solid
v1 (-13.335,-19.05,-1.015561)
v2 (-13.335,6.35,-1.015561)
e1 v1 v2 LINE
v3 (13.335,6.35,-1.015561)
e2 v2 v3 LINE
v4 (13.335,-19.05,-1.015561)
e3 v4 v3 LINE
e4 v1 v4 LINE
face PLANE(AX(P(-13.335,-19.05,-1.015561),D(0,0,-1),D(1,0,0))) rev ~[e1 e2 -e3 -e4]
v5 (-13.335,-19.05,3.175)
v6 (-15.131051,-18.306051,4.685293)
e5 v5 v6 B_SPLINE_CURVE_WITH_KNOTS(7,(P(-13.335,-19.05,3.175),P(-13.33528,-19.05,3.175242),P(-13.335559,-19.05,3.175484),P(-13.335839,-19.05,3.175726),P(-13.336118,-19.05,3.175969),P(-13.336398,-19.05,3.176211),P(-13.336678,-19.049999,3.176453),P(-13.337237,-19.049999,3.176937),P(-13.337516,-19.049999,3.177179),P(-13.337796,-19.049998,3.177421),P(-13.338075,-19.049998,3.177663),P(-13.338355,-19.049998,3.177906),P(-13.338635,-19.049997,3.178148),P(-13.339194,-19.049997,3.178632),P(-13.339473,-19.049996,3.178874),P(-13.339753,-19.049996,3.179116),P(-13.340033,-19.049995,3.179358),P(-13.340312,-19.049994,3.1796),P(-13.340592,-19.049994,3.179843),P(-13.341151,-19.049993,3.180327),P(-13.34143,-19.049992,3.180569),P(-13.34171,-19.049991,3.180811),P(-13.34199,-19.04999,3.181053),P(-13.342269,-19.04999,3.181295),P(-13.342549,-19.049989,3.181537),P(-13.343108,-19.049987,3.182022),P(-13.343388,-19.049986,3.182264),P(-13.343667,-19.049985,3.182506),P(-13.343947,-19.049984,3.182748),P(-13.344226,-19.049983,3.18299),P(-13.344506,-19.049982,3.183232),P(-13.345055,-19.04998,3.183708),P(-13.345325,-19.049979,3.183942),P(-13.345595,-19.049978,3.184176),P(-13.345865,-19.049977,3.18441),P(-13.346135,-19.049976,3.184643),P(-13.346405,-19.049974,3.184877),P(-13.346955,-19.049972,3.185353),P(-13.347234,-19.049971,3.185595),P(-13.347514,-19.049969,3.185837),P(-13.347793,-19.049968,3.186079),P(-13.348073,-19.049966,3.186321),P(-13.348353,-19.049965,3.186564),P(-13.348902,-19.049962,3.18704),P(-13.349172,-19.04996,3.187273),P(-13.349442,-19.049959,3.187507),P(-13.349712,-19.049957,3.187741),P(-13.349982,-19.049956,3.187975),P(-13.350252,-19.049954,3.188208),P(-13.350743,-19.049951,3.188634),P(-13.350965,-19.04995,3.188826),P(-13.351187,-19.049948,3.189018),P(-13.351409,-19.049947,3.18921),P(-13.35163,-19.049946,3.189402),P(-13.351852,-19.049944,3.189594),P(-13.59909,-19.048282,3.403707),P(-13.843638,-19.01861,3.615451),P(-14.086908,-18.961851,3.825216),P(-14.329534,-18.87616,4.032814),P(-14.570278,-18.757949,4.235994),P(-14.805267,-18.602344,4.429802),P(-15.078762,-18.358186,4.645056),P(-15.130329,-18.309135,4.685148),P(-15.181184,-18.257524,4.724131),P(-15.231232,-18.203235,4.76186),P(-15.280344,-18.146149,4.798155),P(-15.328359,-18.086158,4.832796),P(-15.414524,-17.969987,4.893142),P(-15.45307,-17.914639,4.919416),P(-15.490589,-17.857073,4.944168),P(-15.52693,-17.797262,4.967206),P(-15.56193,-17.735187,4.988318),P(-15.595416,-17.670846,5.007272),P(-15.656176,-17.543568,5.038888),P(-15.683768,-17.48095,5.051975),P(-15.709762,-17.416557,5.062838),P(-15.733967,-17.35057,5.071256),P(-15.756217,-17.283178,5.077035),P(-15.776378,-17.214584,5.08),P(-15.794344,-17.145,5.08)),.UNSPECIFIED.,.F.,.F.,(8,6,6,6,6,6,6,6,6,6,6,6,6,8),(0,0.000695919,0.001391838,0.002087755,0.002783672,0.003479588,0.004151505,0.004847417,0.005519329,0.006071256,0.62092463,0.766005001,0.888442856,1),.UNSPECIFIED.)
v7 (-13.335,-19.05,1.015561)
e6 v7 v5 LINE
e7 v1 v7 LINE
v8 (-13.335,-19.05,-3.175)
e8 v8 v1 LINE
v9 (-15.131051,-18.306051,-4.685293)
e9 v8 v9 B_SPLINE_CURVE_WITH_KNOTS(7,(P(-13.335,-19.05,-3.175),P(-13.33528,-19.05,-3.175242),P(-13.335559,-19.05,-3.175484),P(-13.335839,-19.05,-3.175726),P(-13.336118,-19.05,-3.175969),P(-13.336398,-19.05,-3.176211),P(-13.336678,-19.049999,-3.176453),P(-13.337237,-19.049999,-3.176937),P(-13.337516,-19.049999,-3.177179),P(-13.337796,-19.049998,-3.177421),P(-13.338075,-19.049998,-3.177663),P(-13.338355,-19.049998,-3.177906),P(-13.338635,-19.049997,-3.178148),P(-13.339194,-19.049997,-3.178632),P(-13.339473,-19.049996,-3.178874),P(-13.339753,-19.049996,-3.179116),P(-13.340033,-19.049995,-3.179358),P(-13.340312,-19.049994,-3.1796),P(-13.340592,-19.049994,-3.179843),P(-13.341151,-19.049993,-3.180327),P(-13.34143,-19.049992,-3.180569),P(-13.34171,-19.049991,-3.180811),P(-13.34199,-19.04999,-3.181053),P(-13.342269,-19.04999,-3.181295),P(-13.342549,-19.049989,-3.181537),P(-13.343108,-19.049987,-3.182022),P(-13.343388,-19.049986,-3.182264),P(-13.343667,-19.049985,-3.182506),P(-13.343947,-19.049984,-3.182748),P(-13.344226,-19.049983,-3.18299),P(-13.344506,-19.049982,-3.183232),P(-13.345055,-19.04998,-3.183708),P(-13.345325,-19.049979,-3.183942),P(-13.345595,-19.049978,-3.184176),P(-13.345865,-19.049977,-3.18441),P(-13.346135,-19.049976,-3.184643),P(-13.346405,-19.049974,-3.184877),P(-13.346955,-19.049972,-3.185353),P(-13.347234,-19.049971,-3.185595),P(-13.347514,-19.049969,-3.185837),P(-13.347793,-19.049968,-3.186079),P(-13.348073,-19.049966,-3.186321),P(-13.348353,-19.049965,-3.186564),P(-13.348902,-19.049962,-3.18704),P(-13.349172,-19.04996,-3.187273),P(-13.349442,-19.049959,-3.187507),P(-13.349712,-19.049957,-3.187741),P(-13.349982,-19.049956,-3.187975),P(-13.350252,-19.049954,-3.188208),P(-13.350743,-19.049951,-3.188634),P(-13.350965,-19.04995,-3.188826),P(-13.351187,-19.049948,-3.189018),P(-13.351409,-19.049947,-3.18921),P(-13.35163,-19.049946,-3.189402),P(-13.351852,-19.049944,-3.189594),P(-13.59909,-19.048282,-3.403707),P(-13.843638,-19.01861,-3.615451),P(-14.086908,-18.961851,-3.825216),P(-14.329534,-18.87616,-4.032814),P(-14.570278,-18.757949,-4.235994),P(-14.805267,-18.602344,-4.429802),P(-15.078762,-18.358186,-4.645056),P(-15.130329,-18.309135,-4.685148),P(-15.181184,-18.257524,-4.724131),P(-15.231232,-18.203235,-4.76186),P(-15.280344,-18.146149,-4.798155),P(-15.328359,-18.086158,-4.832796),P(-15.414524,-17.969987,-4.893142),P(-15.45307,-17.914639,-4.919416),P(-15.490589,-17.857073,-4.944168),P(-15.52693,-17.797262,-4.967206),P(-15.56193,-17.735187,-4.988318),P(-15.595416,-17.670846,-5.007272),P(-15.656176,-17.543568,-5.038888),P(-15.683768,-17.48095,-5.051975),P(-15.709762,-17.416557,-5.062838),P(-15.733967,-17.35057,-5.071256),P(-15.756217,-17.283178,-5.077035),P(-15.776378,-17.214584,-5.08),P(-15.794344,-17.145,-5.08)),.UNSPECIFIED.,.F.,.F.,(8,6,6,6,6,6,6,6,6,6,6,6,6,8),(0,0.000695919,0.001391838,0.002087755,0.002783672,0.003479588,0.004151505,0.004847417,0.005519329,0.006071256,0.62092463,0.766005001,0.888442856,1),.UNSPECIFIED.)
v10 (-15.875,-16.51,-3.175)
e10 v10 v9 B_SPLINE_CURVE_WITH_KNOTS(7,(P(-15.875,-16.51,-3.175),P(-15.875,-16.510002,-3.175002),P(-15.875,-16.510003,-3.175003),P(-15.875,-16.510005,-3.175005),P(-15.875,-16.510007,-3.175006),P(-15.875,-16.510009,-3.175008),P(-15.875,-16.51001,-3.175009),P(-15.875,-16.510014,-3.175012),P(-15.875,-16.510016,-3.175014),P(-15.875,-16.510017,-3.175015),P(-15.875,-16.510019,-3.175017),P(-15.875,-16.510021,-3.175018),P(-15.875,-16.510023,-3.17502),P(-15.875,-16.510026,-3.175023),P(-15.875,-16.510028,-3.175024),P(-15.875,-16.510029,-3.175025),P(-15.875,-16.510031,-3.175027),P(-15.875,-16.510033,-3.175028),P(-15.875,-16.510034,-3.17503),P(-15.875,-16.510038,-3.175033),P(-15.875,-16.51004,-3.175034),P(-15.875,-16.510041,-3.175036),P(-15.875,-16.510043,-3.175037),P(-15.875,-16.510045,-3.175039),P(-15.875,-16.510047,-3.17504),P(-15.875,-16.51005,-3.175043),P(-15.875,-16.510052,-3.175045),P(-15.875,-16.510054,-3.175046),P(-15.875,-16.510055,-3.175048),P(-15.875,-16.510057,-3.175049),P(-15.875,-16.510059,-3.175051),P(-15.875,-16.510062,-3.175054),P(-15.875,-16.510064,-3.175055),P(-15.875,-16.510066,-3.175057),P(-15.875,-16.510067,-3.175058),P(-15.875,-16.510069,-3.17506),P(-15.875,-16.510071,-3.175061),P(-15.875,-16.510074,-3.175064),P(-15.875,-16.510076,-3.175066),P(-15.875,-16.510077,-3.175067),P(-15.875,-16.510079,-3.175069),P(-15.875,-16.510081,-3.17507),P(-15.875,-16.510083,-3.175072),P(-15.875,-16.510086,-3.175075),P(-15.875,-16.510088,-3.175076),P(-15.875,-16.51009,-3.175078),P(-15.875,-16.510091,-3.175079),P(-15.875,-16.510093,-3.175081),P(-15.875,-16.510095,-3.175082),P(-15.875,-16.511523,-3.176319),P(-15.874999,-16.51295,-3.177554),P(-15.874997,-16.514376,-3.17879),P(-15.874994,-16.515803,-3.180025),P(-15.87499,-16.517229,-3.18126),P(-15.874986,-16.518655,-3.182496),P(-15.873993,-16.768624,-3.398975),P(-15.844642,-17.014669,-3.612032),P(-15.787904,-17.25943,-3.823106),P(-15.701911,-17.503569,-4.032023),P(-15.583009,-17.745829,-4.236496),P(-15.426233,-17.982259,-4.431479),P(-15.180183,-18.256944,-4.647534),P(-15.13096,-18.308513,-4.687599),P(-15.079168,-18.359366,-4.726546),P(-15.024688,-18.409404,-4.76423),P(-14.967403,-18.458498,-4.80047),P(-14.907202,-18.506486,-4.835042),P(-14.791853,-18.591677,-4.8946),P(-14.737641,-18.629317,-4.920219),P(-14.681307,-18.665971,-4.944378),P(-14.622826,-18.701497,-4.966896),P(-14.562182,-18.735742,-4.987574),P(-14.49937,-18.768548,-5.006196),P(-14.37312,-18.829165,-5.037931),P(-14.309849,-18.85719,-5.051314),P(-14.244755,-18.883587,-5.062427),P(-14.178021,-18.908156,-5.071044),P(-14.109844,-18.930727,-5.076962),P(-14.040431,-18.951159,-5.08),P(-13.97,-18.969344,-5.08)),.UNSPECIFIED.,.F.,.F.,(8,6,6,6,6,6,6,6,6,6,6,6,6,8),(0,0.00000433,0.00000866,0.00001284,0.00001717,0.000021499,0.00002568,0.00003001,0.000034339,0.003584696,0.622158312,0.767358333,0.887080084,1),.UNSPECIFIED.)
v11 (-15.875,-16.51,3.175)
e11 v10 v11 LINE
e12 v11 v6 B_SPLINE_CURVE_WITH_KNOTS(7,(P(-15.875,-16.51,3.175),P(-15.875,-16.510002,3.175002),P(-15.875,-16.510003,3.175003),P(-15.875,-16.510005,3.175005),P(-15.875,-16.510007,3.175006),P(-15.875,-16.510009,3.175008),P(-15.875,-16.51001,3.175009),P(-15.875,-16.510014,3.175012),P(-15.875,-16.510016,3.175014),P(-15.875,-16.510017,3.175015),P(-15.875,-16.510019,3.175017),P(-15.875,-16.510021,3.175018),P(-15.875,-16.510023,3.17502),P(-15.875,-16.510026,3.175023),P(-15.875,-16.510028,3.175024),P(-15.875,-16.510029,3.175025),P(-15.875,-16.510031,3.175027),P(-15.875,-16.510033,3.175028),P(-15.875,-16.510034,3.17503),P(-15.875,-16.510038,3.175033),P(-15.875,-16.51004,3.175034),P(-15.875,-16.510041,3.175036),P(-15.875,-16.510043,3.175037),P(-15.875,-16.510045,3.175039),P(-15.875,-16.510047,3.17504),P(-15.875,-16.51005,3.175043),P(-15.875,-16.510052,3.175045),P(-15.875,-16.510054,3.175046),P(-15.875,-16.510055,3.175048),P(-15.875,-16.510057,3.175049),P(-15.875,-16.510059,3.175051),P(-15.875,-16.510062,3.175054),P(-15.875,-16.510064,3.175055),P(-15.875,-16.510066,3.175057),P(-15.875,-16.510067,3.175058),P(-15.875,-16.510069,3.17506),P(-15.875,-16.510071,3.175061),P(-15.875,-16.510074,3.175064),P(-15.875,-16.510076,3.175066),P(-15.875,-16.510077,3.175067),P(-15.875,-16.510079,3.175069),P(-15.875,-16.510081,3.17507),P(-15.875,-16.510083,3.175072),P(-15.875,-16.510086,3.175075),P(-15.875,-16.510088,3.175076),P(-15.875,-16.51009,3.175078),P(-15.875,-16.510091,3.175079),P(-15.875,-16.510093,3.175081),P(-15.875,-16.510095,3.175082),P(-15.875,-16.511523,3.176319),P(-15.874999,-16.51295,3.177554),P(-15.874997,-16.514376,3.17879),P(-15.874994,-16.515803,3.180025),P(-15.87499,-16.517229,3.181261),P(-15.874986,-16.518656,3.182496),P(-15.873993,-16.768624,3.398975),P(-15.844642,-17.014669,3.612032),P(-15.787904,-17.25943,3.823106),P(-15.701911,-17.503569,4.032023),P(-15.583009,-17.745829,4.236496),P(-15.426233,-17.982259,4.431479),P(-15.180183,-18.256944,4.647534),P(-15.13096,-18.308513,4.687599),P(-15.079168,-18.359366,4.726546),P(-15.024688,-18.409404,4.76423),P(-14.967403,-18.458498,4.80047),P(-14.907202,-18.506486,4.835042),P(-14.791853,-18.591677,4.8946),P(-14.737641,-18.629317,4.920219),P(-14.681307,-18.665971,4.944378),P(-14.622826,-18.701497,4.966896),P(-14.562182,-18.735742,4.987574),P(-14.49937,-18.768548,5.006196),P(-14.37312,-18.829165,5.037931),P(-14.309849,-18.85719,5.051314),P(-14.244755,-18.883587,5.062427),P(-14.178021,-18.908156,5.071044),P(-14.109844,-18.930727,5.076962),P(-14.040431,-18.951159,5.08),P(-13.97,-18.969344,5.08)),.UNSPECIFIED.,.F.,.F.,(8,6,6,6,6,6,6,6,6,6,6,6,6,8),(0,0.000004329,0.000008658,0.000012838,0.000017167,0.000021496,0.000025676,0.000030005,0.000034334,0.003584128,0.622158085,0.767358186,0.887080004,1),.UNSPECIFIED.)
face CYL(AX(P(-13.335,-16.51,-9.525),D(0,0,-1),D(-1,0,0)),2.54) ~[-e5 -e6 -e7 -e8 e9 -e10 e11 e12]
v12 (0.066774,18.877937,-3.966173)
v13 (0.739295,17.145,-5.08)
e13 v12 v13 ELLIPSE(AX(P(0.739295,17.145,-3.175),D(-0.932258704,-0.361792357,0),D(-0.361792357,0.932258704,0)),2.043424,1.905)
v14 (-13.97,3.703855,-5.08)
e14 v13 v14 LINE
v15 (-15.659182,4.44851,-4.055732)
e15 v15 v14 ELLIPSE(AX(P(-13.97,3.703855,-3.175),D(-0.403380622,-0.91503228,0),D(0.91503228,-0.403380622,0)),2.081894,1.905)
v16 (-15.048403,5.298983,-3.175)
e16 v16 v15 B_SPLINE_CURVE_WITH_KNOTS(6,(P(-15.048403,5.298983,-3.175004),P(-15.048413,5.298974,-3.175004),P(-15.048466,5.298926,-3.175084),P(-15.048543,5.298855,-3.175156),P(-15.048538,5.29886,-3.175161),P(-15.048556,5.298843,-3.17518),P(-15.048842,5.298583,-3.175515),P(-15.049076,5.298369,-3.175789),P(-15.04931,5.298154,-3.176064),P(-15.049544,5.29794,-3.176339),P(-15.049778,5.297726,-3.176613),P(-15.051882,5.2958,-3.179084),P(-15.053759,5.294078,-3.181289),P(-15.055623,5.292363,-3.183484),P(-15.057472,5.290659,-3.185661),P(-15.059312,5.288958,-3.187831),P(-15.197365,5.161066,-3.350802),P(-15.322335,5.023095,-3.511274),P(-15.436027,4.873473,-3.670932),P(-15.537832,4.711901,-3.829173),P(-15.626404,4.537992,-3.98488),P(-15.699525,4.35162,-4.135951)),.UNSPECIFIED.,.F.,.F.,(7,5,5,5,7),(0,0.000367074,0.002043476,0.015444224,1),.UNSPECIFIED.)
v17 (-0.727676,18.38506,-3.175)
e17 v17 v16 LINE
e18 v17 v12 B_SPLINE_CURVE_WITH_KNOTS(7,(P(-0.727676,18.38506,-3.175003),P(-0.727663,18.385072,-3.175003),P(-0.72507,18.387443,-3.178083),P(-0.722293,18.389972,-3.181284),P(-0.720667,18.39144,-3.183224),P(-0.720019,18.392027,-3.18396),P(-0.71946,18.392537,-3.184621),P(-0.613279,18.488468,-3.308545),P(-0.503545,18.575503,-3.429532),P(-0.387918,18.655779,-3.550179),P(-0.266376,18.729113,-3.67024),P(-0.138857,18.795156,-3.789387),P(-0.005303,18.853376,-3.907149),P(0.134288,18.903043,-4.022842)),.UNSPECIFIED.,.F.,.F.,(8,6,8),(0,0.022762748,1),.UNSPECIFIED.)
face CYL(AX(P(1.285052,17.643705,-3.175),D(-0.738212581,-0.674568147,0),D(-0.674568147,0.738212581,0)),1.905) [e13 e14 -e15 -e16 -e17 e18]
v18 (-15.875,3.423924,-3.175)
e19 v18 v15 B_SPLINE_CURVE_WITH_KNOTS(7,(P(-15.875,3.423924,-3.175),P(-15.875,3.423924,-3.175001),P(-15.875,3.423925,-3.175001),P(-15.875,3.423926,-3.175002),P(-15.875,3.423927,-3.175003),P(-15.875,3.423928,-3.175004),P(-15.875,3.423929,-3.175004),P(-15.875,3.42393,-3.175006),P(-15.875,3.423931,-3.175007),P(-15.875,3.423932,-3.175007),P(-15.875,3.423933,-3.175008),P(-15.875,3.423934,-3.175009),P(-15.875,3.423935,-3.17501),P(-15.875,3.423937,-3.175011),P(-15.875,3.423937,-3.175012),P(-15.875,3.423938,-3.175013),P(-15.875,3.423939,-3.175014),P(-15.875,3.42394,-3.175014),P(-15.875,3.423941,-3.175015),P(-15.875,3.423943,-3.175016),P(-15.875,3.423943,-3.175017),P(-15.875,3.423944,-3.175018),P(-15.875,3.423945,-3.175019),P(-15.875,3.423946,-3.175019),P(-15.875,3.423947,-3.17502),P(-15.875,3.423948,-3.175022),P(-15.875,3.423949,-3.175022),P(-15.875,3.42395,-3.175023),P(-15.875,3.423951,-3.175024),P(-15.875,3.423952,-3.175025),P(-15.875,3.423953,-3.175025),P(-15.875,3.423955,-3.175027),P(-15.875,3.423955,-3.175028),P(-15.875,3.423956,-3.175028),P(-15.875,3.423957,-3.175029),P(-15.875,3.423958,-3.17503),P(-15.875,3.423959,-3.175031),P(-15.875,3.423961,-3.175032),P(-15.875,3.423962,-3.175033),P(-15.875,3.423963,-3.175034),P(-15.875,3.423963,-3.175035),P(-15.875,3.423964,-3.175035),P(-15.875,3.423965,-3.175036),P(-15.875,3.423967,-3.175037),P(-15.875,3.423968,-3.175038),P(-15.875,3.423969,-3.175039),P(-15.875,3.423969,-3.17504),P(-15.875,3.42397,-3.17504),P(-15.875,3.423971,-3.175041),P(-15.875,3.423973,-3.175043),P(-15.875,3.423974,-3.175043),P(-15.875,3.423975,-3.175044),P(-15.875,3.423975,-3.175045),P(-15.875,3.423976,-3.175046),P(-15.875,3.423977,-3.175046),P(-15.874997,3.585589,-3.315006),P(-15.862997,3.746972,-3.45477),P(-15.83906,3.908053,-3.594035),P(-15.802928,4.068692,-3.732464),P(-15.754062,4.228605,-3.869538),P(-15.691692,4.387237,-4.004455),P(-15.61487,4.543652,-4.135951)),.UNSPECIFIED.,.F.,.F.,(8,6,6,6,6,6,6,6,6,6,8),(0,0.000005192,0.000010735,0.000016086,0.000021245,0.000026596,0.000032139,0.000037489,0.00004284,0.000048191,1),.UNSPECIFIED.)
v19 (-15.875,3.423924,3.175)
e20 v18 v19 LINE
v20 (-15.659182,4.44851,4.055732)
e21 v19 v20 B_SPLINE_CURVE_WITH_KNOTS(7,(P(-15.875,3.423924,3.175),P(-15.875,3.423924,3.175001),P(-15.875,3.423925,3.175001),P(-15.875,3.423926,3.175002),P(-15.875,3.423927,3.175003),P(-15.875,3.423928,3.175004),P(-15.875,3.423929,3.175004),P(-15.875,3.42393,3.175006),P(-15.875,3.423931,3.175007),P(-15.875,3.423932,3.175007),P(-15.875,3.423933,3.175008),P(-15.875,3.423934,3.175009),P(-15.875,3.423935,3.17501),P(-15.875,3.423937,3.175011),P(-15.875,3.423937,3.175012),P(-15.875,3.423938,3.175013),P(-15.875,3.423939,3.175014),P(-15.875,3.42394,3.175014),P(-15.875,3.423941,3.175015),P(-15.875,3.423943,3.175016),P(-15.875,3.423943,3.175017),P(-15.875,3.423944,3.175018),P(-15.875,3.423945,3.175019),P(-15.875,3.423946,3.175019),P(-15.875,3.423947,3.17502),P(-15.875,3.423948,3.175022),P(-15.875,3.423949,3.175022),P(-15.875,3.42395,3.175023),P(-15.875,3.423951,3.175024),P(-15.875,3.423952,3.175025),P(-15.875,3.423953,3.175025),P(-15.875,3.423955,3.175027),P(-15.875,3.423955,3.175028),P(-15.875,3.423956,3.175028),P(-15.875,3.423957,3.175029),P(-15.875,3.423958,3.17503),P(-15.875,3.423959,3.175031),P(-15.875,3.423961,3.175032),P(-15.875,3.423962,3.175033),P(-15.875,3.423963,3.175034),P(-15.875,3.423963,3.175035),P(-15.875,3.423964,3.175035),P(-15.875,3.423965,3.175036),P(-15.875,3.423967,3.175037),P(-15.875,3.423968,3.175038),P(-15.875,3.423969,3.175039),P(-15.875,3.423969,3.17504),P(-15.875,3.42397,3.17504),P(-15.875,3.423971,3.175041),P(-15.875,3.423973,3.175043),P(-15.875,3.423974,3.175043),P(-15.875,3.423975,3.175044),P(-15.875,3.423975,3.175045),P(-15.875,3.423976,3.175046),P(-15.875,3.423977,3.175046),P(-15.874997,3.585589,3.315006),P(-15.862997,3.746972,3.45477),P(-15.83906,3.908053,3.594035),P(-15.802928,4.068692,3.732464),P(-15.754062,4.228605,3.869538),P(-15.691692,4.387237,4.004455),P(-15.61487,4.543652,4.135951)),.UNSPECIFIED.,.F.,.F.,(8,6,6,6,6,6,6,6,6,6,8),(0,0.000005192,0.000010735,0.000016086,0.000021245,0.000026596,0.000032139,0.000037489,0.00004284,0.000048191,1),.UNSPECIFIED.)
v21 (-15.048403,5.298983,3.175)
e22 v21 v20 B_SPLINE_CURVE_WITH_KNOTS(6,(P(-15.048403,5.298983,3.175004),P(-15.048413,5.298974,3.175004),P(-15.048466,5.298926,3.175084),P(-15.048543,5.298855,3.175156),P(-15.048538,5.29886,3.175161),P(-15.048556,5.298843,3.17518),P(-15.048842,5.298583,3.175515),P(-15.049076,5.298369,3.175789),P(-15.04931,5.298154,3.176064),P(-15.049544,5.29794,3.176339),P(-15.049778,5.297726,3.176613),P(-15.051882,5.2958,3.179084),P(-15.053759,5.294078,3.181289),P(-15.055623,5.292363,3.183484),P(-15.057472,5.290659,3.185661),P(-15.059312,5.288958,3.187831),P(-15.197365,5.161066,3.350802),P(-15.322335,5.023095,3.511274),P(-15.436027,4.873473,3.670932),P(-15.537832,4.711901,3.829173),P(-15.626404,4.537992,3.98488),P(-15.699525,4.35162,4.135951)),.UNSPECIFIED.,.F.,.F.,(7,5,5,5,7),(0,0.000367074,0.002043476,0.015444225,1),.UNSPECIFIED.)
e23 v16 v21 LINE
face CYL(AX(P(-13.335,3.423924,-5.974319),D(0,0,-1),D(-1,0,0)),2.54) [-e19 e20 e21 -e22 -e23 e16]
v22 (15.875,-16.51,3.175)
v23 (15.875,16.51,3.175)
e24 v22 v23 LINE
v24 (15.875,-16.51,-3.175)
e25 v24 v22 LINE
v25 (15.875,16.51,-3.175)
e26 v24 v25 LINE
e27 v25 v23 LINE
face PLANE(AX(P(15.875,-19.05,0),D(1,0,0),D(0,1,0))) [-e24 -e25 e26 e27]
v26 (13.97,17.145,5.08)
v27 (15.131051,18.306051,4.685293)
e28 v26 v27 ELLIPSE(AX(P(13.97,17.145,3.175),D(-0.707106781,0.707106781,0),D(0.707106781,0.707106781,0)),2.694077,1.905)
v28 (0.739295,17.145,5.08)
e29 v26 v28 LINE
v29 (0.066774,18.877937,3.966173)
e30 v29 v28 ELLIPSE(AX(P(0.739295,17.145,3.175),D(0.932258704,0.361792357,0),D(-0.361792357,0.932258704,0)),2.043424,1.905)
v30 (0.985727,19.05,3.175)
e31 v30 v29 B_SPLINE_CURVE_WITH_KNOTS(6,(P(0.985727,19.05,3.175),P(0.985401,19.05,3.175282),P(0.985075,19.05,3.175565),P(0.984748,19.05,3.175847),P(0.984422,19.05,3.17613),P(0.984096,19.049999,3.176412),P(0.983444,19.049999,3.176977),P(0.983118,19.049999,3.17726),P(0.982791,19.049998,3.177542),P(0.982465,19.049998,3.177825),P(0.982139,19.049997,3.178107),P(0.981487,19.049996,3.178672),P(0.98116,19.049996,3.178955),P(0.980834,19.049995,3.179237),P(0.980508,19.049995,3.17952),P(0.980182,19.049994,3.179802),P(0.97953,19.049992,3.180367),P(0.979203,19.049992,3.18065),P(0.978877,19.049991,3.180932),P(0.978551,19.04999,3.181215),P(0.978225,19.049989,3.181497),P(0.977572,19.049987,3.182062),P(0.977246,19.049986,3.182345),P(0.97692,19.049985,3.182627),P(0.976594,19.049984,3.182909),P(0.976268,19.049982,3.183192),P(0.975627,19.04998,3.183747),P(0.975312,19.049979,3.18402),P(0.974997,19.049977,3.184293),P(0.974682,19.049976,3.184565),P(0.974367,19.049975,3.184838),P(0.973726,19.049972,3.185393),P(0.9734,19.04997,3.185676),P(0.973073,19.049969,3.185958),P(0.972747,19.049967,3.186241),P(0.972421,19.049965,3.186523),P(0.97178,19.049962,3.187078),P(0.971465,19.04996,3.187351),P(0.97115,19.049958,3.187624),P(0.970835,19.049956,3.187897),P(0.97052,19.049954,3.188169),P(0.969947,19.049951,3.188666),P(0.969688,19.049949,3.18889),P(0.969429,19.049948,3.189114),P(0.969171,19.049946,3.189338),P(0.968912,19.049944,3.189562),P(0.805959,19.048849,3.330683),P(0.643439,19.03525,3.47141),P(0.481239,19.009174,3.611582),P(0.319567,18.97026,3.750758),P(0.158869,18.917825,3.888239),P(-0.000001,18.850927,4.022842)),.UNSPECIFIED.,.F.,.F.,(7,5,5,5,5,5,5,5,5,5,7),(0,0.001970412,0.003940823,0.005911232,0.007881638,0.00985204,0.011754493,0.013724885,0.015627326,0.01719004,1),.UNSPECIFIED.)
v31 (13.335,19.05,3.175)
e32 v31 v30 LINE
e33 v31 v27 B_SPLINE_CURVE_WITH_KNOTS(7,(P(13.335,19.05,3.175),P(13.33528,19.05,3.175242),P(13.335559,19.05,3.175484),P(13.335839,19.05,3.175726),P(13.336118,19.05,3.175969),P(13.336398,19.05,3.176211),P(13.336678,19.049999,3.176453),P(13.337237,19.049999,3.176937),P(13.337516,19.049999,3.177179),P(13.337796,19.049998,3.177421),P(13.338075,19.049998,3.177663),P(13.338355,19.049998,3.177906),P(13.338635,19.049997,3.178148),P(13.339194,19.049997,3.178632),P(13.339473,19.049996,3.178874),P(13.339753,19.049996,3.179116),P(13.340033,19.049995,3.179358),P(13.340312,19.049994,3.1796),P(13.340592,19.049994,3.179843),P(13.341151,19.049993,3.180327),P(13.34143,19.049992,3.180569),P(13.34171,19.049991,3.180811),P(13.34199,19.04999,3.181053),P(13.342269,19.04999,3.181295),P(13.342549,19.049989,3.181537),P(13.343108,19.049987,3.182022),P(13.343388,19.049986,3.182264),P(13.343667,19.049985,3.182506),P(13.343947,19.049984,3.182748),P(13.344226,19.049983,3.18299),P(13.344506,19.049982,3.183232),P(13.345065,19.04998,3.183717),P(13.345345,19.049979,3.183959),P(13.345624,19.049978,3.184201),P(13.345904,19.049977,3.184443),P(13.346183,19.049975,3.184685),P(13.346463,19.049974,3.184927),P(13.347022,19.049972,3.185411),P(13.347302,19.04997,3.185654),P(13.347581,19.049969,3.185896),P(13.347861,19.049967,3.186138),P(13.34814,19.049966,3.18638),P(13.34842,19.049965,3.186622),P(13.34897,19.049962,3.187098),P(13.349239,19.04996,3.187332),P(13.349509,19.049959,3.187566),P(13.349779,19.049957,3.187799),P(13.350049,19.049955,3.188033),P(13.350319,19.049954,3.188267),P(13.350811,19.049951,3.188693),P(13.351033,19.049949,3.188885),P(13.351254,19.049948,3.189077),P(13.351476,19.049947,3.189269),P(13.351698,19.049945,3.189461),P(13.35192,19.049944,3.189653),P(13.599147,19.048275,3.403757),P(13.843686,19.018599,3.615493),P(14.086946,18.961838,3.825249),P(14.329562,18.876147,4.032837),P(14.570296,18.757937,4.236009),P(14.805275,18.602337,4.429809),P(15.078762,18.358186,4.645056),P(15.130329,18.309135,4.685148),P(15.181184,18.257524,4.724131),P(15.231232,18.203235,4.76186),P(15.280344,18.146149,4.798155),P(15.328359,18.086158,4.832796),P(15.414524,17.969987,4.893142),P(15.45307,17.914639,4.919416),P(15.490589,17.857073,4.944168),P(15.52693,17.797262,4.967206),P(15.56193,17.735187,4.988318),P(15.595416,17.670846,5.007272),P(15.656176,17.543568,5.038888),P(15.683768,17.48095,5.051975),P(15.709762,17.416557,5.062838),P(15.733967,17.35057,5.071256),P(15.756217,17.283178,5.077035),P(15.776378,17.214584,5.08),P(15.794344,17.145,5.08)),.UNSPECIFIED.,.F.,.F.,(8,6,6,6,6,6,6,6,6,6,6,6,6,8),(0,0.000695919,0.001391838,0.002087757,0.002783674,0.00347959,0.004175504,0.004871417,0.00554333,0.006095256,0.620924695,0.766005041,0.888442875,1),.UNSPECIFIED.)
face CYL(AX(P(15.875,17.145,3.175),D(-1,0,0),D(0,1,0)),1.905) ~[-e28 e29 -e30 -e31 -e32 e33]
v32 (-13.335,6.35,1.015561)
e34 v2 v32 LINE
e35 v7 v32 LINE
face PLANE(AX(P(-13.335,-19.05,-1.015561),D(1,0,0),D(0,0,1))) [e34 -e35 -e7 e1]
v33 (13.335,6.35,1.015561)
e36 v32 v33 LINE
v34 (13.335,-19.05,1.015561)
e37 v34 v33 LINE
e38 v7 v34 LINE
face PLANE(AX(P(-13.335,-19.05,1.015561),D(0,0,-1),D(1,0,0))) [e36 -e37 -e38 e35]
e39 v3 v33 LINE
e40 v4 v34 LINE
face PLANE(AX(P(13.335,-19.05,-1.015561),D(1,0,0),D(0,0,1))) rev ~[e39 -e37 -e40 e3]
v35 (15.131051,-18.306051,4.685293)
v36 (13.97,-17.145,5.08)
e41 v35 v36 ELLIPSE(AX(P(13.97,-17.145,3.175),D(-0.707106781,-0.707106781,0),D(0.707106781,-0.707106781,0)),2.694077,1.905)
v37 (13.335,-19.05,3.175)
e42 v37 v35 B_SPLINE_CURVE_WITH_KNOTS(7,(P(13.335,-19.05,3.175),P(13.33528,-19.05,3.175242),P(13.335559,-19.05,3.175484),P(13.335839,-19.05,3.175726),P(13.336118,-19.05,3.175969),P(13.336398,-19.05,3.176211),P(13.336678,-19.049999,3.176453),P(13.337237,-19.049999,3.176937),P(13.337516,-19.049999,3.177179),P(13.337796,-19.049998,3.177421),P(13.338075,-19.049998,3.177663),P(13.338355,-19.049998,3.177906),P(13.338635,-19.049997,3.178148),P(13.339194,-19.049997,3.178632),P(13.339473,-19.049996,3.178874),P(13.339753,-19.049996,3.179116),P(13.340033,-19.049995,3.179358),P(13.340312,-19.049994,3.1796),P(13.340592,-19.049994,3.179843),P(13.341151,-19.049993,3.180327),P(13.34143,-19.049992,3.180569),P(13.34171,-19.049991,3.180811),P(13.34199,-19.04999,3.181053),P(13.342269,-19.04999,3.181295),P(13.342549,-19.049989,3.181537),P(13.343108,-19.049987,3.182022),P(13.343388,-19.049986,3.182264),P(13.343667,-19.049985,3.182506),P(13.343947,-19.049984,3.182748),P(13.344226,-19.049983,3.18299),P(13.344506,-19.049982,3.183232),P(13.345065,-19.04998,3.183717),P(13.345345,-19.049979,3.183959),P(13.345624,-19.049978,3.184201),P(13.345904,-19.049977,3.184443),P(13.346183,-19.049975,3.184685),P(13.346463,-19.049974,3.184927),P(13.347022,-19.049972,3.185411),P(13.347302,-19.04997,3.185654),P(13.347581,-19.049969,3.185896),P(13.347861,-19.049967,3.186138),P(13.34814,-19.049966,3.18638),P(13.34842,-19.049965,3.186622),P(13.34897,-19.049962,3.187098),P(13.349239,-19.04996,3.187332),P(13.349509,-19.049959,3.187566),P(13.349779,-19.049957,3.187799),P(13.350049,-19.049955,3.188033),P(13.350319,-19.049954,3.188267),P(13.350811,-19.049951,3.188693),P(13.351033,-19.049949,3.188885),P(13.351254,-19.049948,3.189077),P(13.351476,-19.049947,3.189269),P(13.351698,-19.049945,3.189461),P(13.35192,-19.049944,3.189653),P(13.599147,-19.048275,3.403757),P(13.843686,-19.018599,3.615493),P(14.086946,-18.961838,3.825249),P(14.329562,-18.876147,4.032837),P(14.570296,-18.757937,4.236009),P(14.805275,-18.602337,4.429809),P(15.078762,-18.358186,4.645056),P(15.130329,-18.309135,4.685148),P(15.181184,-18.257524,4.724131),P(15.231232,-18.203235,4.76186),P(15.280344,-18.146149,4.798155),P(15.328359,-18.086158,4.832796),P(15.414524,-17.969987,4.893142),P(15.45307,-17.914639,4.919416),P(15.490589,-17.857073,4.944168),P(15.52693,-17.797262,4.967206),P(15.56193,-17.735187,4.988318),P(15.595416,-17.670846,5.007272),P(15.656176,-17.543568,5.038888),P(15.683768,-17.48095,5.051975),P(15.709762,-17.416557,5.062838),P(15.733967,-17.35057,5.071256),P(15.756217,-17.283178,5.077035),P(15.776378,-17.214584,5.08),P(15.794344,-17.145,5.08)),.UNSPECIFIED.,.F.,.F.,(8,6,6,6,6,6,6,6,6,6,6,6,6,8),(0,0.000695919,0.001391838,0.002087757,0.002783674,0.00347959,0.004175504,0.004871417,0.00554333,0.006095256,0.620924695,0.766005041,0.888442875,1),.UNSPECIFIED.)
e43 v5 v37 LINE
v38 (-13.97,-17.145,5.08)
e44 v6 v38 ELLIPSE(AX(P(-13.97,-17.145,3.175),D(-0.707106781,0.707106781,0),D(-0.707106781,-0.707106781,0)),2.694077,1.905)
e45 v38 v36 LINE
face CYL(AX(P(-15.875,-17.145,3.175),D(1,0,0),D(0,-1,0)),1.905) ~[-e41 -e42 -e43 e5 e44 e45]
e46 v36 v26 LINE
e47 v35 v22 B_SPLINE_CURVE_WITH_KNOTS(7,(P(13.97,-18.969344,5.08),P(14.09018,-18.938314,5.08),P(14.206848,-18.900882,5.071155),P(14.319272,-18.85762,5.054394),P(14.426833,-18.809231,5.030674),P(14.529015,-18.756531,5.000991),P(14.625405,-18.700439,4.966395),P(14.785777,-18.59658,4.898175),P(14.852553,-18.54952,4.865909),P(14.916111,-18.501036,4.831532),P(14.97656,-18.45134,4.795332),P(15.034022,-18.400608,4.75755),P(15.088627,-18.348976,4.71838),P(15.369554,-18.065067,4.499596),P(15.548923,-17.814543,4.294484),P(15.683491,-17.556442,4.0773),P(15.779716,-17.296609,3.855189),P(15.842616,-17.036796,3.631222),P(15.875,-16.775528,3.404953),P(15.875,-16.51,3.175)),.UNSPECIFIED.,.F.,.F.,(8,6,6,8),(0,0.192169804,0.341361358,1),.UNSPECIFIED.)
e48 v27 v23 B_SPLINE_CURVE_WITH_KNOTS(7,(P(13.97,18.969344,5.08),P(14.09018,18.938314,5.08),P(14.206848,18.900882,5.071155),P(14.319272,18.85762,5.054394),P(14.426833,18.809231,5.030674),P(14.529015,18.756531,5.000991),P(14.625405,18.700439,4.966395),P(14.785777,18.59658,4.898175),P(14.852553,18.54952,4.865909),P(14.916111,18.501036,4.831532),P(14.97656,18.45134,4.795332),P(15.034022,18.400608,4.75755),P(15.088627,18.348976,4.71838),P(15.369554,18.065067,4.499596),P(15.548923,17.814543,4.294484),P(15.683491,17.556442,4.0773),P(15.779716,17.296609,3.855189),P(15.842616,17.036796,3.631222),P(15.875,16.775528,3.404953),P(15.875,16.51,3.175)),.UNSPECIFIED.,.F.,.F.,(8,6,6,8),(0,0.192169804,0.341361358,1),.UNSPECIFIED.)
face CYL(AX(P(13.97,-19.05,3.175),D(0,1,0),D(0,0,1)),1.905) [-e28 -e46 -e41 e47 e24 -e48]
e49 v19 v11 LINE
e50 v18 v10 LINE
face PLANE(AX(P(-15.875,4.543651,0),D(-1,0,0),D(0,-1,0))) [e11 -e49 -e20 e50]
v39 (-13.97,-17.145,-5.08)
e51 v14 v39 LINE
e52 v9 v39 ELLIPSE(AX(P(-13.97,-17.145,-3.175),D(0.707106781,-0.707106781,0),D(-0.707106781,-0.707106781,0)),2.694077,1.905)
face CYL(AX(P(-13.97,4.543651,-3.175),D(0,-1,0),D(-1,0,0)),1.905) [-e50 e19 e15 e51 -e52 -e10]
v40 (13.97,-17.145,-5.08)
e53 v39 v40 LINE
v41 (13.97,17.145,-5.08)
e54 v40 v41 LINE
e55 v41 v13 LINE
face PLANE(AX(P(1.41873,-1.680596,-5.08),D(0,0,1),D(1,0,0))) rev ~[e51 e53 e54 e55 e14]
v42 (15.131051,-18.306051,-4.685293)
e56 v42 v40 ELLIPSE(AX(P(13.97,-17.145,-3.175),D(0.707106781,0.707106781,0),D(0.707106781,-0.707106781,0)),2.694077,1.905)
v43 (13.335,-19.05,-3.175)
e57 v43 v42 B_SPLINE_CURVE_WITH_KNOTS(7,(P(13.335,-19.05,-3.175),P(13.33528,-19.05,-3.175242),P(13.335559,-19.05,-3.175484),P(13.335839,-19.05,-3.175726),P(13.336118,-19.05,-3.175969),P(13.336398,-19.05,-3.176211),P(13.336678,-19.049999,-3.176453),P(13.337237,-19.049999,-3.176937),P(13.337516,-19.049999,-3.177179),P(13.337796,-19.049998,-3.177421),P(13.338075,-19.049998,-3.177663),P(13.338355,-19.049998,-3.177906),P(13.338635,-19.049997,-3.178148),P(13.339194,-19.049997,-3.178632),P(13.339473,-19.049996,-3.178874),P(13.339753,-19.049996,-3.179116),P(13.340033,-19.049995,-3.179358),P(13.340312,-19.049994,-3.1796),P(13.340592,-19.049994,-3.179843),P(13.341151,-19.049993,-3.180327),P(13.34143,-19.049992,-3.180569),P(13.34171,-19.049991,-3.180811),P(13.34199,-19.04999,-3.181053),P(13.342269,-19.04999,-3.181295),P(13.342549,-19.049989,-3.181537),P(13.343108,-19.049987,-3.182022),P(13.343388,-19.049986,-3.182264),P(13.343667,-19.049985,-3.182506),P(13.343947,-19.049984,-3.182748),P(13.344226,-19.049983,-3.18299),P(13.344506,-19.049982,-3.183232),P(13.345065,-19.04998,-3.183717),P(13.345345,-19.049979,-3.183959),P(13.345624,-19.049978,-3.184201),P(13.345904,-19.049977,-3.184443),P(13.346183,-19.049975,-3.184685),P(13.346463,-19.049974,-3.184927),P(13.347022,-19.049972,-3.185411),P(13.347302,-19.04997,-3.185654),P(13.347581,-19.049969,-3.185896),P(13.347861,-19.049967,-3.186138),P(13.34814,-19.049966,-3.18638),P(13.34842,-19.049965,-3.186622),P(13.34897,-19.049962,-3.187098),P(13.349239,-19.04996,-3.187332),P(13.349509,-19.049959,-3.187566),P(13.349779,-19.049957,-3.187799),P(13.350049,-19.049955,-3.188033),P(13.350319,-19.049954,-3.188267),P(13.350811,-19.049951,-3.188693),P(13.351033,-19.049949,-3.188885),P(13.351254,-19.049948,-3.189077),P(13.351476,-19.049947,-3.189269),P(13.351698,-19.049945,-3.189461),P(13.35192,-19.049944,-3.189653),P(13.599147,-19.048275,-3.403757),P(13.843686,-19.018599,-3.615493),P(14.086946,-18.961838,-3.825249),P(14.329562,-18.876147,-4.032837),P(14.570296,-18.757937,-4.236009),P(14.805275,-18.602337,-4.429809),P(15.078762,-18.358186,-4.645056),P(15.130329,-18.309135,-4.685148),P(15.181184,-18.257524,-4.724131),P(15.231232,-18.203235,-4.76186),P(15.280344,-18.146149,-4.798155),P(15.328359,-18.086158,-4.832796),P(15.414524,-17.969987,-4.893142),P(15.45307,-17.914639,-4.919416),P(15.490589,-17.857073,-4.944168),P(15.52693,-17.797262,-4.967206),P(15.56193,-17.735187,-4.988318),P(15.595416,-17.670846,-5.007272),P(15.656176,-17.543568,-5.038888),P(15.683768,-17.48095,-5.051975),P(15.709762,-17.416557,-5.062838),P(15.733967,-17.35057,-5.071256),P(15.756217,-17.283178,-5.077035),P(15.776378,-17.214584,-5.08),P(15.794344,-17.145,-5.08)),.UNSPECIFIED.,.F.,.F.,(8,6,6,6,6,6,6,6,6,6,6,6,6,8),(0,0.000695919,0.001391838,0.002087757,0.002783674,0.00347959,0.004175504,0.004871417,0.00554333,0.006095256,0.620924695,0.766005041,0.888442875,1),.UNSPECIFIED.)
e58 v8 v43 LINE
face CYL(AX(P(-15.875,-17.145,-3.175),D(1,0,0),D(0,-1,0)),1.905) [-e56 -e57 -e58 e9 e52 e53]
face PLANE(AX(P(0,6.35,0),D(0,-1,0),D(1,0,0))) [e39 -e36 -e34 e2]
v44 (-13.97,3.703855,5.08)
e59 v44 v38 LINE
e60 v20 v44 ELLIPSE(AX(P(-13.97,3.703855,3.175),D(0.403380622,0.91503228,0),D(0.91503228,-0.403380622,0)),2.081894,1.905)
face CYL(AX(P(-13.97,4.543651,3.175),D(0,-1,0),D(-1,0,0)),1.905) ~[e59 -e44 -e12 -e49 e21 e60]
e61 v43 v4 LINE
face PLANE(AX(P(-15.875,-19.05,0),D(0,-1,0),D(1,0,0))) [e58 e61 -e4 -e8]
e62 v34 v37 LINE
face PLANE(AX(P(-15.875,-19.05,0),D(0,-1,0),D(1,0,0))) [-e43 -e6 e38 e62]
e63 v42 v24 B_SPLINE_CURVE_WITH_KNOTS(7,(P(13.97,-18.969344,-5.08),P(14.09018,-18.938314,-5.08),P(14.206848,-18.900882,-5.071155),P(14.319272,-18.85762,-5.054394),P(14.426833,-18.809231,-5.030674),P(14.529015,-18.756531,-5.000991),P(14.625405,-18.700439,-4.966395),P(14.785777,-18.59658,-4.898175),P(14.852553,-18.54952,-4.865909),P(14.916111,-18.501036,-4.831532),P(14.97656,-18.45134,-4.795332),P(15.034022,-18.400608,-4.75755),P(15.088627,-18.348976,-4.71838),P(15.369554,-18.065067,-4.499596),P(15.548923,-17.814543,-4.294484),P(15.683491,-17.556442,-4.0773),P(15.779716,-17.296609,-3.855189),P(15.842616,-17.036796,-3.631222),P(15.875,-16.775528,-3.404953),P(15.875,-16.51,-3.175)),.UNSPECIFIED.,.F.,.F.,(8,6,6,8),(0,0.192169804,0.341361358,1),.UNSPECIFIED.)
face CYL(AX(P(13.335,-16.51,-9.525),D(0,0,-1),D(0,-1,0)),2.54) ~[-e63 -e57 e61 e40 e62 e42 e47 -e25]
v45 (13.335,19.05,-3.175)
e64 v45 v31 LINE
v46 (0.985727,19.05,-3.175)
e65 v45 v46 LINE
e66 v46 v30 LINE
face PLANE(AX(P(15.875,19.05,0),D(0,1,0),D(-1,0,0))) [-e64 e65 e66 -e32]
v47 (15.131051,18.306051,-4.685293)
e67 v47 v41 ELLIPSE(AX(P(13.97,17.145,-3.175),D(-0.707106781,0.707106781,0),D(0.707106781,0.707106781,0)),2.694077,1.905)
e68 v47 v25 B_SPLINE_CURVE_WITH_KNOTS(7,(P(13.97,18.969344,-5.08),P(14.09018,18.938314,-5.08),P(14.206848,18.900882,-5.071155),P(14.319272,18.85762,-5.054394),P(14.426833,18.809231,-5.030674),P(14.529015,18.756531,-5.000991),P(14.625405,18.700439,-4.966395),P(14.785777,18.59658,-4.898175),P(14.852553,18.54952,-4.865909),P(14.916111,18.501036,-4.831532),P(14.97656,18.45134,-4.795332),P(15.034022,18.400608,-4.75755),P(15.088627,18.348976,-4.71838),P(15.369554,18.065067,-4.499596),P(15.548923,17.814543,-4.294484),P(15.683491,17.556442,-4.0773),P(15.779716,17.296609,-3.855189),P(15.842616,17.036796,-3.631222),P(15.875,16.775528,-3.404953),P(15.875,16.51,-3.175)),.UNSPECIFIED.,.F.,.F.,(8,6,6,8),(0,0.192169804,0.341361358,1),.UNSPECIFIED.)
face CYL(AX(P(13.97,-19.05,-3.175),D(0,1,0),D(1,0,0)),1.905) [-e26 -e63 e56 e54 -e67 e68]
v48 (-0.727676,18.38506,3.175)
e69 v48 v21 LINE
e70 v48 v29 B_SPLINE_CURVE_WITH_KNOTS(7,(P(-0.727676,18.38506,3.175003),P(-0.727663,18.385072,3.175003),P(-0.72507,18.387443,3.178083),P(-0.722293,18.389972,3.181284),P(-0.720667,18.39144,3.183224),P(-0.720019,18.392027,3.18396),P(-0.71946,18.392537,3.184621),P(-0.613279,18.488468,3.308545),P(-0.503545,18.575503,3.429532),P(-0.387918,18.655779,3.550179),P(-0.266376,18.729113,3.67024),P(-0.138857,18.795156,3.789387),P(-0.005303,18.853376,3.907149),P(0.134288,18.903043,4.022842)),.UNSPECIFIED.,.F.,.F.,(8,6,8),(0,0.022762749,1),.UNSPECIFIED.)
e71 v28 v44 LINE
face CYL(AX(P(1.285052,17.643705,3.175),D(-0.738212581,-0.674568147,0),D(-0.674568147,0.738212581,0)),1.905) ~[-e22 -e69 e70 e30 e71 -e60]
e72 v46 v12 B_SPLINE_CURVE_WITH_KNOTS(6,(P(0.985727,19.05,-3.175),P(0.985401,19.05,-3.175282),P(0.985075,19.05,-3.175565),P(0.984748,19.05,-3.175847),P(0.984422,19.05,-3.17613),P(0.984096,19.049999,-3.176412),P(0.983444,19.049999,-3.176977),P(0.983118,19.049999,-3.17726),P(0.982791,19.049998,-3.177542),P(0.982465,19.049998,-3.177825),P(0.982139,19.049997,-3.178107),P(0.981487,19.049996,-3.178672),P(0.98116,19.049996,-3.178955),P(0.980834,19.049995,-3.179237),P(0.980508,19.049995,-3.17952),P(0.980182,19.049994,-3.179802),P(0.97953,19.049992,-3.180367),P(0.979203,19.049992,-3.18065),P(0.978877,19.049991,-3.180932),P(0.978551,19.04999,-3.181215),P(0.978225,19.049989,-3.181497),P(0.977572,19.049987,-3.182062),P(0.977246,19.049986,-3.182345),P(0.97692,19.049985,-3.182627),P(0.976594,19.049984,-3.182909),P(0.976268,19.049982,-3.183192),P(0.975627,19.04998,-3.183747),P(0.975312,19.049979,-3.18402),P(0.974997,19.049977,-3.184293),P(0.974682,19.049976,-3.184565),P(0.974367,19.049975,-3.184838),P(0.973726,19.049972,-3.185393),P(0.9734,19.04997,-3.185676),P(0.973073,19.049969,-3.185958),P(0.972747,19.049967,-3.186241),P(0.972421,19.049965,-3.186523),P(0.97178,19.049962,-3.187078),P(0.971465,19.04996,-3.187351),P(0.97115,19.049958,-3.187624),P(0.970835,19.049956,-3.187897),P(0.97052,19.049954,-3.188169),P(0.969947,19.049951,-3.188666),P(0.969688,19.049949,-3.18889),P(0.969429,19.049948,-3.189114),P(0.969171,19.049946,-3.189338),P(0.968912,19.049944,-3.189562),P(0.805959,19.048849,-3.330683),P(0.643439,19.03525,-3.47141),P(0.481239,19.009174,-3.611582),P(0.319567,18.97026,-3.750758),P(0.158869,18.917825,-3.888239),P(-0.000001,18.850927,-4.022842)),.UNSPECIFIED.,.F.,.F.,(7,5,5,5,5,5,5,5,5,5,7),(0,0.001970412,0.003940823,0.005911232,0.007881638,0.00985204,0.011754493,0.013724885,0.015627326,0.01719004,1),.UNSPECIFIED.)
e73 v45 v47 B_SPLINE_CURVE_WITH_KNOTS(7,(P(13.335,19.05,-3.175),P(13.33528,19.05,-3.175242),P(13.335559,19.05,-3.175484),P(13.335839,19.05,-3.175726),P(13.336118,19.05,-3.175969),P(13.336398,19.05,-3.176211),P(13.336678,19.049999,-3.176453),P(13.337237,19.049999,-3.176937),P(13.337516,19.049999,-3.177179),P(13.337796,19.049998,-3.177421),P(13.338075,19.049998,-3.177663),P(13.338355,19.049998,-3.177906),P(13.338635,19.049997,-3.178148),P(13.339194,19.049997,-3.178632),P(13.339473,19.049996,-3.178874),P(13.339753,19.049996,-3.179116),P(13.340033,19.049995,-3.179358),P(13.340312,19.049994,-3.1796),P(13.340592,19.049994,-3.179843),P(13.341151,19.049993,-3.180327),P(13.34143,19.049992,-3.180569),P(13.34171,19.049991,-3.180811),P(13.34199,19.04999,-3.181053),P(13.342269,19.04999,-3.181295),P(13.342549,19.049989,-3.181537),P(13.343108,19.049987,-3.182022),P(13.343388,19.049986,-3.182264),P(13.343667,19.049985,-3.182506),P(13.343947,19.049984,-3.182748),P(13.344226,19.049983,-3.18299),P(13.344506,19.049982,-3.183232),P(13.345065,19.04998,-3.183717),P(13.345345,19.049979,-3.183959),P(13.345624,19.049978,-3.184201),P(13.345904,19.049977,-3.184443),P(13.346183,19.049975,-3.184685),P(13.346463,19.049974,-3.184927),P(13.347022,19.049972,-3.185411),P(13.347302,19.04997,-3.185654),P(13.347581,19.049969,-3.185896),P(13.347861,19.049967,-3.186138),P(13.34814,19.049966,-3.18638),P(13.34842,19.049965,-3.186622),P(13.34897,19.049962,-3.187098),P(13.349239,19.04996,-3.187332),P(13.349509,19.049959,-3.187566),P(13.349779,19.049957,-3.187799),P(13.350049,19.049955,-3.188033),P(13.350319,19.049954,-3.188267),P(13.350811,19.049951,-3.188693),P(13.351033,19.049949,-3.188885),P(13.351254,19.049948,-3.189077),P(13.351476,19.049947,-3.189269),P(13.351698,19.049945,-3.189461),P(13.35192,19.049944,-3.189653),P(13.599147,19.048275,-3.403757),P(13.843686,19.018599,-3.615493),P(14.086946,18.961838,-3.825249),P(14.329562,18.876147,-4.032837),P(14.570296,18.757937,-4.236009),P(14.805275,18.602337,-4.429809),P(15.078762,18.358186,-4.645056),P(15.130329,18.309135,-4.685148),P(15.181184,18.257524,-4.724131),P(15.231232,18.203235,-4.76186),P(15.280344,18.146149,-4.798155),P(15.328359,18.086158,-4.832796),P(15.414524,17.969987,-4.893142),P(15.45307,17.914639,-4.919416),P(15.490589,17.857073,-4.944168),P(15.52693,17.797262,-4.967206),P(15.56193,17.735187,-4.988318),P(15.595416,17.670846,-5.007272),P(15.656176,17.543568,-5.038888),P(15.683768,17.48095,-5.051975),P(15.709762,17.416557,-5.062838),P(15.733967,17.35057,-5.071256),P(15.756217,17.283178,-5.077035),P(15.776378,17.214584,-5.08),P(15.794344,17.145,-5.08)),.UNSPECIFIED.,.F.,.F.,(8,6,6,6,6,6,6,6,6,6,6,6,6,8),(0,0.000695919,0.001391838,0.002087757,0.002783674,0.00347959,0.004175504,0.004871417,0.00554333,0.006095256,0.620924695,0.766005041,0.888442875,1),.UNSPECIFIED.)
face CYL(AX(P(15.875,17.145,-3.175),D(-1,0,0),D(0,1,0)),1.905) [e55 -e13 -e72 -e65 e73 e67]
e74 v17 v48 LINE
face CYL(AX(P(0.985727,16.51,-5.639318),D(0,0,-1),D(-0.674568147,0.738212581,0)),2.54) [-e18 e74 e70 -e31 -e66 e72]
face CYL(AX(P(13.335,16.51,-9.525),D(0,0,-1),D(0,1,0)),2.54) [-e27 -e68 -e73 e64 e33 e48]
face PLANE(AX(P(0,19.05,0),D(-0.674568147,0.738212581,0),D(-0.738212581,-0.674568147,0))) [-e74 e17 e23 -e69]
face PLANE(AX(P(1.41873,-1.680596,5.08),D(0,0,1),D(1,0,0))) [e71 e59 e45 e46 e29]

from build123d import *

# Parameters (mm, degrees)
F1_DEPTH      = 5.08
F1_DEPTH_BACK = 5.08
F2_R          = 1.905
F3_T1_DEPTH   = 19.05
F3_T3_DEPTH   = 11.9486373525
F3_T5_DEPTH   = 11.278635061
F4_W          = 26.67
F4_H          = 2.0311224633
F5_DEPTH      = 25.4


# Not quite as in the source:
# - a fillet or chamfer that OpenCascade refuses, or shapes differently, is made with other operations: its cross-section is extruded or revolved along the edge and cut away or added


with BuildPart() as f1:
    # F0 (on Top) → F1 (new body, two sides)
    with BuildSketch(Plane.XY) as f1_sk:
        Polygon((-15.875, -19.05), (15.875, -19.05), (15.875, 19.05), (0, 19.05), (-15.875, 4.5436509977), align=None)
    extrude(amount=F1_DEPTH)
    extrude(f1_sk.sketch, amount=-F1_DEPTH_BACK)

    # F2
    f2_edges = [f1.edges().sort_by_distance(p)[0] for p in [
        (-15.875, -7.253175, 5.08),
        (0, -19.05, 5.08),
        (15.875, 0, 5.08),
        (7.9375, 19.05, 5.08),
        (-7.9375, 11.796825, 5.08),
        (-15.875, -7.253175, -5.08),
        (0, -19.05, -5.08),
        (15.875, 0, -5.08),
        (7.9375, 19.05, -5.08),
        (-7.9375, 11.796825, -5.08),
    ]]
    fillet(f2_edges, radius=F2_R)

    # F3: fillet of radius 2.54 on 15 edges, made by hand

    # F3_s2 → F3_t1 (cut)
    with BuildSketch(Plane.XY.offset(-9.525)):
        with BuildLine():
            ThreePointArc((13.335, -19.05), (15.1310512242, -18.3060512242), (15.875, -16.51))
            Line((15.875, -16.51), (15.875, -19.05))
            Line((15.875, -19.05), (13.335, -19.05))
        make_face()
        with BuildLine():
            ThreePointArc((-15.875, -16.51), (-15.1310512242, -18.3060512242), (-13.335, -19.05))
            Line((-13.335, -19.05), (-15.875, -19.05))
            Line((-15.875, -19.05), (-15.875, -16.51))
        make_face()
        with BuildLine():
            ThreePointArc((13.335, 19.05), (15.1310512242, 18.3060512242), (15.875, 16.51))
            Line((15.875, 16.51), (15.875, 19.05))
            Line((15.875, 19.05), (13.335, 19.05))
        make_face()
    extrude(amount=F3_T1_DEPTH, mode=Mode.SUBTRACT)

    # F3_s4 → F3_t3 (cut)
    with BuildSketch(Plane.XY.offset(-5.9743186762)):
        with BuildLine():
            ThreePointArc((-15.875, 3.4239235272), (-15.6591819915, 4.4485103076), (-15.048403094, 5.2989834829))
            Line((-15.048403094, 5.2989834829), (-15.875, 4.5436509977))
            Line((-15.875, 4.5436509977), (-15.875, 3.4239235272))
        make_face()
    extrude(amount=F3_T3_DEPTH, mode=Mode.SUBTRACT)

    # F3_s6 → F3_t5 (cut)
    with BuildSketch(Plane.XY.offset(-5.6393175305)):
        with BuildLine():
            ThreePointArc((-0.7276760818, 18.3850599557), (0.0667744257, 18.8779371072), (0.9857270122, 19.05))
            Line((0.9857270122, 19.05), (0, 19.05))
            Line((0, 19.05), (-0.7276760818, 18.3850599557))
        make_face()
    extrude(amount=F3_T5_DEPTH, mode=Mode.SUBTRACT)

    # F4 (on face) → F5 (cut)
    with BuildSketch(Plane.XZ.offset(19.05)):
        Rectangle(F4_W, F4_H)
    extrude(amount=-F5_DEPTH, mode=Mode.SUBTRACT)


solid = f1.part
